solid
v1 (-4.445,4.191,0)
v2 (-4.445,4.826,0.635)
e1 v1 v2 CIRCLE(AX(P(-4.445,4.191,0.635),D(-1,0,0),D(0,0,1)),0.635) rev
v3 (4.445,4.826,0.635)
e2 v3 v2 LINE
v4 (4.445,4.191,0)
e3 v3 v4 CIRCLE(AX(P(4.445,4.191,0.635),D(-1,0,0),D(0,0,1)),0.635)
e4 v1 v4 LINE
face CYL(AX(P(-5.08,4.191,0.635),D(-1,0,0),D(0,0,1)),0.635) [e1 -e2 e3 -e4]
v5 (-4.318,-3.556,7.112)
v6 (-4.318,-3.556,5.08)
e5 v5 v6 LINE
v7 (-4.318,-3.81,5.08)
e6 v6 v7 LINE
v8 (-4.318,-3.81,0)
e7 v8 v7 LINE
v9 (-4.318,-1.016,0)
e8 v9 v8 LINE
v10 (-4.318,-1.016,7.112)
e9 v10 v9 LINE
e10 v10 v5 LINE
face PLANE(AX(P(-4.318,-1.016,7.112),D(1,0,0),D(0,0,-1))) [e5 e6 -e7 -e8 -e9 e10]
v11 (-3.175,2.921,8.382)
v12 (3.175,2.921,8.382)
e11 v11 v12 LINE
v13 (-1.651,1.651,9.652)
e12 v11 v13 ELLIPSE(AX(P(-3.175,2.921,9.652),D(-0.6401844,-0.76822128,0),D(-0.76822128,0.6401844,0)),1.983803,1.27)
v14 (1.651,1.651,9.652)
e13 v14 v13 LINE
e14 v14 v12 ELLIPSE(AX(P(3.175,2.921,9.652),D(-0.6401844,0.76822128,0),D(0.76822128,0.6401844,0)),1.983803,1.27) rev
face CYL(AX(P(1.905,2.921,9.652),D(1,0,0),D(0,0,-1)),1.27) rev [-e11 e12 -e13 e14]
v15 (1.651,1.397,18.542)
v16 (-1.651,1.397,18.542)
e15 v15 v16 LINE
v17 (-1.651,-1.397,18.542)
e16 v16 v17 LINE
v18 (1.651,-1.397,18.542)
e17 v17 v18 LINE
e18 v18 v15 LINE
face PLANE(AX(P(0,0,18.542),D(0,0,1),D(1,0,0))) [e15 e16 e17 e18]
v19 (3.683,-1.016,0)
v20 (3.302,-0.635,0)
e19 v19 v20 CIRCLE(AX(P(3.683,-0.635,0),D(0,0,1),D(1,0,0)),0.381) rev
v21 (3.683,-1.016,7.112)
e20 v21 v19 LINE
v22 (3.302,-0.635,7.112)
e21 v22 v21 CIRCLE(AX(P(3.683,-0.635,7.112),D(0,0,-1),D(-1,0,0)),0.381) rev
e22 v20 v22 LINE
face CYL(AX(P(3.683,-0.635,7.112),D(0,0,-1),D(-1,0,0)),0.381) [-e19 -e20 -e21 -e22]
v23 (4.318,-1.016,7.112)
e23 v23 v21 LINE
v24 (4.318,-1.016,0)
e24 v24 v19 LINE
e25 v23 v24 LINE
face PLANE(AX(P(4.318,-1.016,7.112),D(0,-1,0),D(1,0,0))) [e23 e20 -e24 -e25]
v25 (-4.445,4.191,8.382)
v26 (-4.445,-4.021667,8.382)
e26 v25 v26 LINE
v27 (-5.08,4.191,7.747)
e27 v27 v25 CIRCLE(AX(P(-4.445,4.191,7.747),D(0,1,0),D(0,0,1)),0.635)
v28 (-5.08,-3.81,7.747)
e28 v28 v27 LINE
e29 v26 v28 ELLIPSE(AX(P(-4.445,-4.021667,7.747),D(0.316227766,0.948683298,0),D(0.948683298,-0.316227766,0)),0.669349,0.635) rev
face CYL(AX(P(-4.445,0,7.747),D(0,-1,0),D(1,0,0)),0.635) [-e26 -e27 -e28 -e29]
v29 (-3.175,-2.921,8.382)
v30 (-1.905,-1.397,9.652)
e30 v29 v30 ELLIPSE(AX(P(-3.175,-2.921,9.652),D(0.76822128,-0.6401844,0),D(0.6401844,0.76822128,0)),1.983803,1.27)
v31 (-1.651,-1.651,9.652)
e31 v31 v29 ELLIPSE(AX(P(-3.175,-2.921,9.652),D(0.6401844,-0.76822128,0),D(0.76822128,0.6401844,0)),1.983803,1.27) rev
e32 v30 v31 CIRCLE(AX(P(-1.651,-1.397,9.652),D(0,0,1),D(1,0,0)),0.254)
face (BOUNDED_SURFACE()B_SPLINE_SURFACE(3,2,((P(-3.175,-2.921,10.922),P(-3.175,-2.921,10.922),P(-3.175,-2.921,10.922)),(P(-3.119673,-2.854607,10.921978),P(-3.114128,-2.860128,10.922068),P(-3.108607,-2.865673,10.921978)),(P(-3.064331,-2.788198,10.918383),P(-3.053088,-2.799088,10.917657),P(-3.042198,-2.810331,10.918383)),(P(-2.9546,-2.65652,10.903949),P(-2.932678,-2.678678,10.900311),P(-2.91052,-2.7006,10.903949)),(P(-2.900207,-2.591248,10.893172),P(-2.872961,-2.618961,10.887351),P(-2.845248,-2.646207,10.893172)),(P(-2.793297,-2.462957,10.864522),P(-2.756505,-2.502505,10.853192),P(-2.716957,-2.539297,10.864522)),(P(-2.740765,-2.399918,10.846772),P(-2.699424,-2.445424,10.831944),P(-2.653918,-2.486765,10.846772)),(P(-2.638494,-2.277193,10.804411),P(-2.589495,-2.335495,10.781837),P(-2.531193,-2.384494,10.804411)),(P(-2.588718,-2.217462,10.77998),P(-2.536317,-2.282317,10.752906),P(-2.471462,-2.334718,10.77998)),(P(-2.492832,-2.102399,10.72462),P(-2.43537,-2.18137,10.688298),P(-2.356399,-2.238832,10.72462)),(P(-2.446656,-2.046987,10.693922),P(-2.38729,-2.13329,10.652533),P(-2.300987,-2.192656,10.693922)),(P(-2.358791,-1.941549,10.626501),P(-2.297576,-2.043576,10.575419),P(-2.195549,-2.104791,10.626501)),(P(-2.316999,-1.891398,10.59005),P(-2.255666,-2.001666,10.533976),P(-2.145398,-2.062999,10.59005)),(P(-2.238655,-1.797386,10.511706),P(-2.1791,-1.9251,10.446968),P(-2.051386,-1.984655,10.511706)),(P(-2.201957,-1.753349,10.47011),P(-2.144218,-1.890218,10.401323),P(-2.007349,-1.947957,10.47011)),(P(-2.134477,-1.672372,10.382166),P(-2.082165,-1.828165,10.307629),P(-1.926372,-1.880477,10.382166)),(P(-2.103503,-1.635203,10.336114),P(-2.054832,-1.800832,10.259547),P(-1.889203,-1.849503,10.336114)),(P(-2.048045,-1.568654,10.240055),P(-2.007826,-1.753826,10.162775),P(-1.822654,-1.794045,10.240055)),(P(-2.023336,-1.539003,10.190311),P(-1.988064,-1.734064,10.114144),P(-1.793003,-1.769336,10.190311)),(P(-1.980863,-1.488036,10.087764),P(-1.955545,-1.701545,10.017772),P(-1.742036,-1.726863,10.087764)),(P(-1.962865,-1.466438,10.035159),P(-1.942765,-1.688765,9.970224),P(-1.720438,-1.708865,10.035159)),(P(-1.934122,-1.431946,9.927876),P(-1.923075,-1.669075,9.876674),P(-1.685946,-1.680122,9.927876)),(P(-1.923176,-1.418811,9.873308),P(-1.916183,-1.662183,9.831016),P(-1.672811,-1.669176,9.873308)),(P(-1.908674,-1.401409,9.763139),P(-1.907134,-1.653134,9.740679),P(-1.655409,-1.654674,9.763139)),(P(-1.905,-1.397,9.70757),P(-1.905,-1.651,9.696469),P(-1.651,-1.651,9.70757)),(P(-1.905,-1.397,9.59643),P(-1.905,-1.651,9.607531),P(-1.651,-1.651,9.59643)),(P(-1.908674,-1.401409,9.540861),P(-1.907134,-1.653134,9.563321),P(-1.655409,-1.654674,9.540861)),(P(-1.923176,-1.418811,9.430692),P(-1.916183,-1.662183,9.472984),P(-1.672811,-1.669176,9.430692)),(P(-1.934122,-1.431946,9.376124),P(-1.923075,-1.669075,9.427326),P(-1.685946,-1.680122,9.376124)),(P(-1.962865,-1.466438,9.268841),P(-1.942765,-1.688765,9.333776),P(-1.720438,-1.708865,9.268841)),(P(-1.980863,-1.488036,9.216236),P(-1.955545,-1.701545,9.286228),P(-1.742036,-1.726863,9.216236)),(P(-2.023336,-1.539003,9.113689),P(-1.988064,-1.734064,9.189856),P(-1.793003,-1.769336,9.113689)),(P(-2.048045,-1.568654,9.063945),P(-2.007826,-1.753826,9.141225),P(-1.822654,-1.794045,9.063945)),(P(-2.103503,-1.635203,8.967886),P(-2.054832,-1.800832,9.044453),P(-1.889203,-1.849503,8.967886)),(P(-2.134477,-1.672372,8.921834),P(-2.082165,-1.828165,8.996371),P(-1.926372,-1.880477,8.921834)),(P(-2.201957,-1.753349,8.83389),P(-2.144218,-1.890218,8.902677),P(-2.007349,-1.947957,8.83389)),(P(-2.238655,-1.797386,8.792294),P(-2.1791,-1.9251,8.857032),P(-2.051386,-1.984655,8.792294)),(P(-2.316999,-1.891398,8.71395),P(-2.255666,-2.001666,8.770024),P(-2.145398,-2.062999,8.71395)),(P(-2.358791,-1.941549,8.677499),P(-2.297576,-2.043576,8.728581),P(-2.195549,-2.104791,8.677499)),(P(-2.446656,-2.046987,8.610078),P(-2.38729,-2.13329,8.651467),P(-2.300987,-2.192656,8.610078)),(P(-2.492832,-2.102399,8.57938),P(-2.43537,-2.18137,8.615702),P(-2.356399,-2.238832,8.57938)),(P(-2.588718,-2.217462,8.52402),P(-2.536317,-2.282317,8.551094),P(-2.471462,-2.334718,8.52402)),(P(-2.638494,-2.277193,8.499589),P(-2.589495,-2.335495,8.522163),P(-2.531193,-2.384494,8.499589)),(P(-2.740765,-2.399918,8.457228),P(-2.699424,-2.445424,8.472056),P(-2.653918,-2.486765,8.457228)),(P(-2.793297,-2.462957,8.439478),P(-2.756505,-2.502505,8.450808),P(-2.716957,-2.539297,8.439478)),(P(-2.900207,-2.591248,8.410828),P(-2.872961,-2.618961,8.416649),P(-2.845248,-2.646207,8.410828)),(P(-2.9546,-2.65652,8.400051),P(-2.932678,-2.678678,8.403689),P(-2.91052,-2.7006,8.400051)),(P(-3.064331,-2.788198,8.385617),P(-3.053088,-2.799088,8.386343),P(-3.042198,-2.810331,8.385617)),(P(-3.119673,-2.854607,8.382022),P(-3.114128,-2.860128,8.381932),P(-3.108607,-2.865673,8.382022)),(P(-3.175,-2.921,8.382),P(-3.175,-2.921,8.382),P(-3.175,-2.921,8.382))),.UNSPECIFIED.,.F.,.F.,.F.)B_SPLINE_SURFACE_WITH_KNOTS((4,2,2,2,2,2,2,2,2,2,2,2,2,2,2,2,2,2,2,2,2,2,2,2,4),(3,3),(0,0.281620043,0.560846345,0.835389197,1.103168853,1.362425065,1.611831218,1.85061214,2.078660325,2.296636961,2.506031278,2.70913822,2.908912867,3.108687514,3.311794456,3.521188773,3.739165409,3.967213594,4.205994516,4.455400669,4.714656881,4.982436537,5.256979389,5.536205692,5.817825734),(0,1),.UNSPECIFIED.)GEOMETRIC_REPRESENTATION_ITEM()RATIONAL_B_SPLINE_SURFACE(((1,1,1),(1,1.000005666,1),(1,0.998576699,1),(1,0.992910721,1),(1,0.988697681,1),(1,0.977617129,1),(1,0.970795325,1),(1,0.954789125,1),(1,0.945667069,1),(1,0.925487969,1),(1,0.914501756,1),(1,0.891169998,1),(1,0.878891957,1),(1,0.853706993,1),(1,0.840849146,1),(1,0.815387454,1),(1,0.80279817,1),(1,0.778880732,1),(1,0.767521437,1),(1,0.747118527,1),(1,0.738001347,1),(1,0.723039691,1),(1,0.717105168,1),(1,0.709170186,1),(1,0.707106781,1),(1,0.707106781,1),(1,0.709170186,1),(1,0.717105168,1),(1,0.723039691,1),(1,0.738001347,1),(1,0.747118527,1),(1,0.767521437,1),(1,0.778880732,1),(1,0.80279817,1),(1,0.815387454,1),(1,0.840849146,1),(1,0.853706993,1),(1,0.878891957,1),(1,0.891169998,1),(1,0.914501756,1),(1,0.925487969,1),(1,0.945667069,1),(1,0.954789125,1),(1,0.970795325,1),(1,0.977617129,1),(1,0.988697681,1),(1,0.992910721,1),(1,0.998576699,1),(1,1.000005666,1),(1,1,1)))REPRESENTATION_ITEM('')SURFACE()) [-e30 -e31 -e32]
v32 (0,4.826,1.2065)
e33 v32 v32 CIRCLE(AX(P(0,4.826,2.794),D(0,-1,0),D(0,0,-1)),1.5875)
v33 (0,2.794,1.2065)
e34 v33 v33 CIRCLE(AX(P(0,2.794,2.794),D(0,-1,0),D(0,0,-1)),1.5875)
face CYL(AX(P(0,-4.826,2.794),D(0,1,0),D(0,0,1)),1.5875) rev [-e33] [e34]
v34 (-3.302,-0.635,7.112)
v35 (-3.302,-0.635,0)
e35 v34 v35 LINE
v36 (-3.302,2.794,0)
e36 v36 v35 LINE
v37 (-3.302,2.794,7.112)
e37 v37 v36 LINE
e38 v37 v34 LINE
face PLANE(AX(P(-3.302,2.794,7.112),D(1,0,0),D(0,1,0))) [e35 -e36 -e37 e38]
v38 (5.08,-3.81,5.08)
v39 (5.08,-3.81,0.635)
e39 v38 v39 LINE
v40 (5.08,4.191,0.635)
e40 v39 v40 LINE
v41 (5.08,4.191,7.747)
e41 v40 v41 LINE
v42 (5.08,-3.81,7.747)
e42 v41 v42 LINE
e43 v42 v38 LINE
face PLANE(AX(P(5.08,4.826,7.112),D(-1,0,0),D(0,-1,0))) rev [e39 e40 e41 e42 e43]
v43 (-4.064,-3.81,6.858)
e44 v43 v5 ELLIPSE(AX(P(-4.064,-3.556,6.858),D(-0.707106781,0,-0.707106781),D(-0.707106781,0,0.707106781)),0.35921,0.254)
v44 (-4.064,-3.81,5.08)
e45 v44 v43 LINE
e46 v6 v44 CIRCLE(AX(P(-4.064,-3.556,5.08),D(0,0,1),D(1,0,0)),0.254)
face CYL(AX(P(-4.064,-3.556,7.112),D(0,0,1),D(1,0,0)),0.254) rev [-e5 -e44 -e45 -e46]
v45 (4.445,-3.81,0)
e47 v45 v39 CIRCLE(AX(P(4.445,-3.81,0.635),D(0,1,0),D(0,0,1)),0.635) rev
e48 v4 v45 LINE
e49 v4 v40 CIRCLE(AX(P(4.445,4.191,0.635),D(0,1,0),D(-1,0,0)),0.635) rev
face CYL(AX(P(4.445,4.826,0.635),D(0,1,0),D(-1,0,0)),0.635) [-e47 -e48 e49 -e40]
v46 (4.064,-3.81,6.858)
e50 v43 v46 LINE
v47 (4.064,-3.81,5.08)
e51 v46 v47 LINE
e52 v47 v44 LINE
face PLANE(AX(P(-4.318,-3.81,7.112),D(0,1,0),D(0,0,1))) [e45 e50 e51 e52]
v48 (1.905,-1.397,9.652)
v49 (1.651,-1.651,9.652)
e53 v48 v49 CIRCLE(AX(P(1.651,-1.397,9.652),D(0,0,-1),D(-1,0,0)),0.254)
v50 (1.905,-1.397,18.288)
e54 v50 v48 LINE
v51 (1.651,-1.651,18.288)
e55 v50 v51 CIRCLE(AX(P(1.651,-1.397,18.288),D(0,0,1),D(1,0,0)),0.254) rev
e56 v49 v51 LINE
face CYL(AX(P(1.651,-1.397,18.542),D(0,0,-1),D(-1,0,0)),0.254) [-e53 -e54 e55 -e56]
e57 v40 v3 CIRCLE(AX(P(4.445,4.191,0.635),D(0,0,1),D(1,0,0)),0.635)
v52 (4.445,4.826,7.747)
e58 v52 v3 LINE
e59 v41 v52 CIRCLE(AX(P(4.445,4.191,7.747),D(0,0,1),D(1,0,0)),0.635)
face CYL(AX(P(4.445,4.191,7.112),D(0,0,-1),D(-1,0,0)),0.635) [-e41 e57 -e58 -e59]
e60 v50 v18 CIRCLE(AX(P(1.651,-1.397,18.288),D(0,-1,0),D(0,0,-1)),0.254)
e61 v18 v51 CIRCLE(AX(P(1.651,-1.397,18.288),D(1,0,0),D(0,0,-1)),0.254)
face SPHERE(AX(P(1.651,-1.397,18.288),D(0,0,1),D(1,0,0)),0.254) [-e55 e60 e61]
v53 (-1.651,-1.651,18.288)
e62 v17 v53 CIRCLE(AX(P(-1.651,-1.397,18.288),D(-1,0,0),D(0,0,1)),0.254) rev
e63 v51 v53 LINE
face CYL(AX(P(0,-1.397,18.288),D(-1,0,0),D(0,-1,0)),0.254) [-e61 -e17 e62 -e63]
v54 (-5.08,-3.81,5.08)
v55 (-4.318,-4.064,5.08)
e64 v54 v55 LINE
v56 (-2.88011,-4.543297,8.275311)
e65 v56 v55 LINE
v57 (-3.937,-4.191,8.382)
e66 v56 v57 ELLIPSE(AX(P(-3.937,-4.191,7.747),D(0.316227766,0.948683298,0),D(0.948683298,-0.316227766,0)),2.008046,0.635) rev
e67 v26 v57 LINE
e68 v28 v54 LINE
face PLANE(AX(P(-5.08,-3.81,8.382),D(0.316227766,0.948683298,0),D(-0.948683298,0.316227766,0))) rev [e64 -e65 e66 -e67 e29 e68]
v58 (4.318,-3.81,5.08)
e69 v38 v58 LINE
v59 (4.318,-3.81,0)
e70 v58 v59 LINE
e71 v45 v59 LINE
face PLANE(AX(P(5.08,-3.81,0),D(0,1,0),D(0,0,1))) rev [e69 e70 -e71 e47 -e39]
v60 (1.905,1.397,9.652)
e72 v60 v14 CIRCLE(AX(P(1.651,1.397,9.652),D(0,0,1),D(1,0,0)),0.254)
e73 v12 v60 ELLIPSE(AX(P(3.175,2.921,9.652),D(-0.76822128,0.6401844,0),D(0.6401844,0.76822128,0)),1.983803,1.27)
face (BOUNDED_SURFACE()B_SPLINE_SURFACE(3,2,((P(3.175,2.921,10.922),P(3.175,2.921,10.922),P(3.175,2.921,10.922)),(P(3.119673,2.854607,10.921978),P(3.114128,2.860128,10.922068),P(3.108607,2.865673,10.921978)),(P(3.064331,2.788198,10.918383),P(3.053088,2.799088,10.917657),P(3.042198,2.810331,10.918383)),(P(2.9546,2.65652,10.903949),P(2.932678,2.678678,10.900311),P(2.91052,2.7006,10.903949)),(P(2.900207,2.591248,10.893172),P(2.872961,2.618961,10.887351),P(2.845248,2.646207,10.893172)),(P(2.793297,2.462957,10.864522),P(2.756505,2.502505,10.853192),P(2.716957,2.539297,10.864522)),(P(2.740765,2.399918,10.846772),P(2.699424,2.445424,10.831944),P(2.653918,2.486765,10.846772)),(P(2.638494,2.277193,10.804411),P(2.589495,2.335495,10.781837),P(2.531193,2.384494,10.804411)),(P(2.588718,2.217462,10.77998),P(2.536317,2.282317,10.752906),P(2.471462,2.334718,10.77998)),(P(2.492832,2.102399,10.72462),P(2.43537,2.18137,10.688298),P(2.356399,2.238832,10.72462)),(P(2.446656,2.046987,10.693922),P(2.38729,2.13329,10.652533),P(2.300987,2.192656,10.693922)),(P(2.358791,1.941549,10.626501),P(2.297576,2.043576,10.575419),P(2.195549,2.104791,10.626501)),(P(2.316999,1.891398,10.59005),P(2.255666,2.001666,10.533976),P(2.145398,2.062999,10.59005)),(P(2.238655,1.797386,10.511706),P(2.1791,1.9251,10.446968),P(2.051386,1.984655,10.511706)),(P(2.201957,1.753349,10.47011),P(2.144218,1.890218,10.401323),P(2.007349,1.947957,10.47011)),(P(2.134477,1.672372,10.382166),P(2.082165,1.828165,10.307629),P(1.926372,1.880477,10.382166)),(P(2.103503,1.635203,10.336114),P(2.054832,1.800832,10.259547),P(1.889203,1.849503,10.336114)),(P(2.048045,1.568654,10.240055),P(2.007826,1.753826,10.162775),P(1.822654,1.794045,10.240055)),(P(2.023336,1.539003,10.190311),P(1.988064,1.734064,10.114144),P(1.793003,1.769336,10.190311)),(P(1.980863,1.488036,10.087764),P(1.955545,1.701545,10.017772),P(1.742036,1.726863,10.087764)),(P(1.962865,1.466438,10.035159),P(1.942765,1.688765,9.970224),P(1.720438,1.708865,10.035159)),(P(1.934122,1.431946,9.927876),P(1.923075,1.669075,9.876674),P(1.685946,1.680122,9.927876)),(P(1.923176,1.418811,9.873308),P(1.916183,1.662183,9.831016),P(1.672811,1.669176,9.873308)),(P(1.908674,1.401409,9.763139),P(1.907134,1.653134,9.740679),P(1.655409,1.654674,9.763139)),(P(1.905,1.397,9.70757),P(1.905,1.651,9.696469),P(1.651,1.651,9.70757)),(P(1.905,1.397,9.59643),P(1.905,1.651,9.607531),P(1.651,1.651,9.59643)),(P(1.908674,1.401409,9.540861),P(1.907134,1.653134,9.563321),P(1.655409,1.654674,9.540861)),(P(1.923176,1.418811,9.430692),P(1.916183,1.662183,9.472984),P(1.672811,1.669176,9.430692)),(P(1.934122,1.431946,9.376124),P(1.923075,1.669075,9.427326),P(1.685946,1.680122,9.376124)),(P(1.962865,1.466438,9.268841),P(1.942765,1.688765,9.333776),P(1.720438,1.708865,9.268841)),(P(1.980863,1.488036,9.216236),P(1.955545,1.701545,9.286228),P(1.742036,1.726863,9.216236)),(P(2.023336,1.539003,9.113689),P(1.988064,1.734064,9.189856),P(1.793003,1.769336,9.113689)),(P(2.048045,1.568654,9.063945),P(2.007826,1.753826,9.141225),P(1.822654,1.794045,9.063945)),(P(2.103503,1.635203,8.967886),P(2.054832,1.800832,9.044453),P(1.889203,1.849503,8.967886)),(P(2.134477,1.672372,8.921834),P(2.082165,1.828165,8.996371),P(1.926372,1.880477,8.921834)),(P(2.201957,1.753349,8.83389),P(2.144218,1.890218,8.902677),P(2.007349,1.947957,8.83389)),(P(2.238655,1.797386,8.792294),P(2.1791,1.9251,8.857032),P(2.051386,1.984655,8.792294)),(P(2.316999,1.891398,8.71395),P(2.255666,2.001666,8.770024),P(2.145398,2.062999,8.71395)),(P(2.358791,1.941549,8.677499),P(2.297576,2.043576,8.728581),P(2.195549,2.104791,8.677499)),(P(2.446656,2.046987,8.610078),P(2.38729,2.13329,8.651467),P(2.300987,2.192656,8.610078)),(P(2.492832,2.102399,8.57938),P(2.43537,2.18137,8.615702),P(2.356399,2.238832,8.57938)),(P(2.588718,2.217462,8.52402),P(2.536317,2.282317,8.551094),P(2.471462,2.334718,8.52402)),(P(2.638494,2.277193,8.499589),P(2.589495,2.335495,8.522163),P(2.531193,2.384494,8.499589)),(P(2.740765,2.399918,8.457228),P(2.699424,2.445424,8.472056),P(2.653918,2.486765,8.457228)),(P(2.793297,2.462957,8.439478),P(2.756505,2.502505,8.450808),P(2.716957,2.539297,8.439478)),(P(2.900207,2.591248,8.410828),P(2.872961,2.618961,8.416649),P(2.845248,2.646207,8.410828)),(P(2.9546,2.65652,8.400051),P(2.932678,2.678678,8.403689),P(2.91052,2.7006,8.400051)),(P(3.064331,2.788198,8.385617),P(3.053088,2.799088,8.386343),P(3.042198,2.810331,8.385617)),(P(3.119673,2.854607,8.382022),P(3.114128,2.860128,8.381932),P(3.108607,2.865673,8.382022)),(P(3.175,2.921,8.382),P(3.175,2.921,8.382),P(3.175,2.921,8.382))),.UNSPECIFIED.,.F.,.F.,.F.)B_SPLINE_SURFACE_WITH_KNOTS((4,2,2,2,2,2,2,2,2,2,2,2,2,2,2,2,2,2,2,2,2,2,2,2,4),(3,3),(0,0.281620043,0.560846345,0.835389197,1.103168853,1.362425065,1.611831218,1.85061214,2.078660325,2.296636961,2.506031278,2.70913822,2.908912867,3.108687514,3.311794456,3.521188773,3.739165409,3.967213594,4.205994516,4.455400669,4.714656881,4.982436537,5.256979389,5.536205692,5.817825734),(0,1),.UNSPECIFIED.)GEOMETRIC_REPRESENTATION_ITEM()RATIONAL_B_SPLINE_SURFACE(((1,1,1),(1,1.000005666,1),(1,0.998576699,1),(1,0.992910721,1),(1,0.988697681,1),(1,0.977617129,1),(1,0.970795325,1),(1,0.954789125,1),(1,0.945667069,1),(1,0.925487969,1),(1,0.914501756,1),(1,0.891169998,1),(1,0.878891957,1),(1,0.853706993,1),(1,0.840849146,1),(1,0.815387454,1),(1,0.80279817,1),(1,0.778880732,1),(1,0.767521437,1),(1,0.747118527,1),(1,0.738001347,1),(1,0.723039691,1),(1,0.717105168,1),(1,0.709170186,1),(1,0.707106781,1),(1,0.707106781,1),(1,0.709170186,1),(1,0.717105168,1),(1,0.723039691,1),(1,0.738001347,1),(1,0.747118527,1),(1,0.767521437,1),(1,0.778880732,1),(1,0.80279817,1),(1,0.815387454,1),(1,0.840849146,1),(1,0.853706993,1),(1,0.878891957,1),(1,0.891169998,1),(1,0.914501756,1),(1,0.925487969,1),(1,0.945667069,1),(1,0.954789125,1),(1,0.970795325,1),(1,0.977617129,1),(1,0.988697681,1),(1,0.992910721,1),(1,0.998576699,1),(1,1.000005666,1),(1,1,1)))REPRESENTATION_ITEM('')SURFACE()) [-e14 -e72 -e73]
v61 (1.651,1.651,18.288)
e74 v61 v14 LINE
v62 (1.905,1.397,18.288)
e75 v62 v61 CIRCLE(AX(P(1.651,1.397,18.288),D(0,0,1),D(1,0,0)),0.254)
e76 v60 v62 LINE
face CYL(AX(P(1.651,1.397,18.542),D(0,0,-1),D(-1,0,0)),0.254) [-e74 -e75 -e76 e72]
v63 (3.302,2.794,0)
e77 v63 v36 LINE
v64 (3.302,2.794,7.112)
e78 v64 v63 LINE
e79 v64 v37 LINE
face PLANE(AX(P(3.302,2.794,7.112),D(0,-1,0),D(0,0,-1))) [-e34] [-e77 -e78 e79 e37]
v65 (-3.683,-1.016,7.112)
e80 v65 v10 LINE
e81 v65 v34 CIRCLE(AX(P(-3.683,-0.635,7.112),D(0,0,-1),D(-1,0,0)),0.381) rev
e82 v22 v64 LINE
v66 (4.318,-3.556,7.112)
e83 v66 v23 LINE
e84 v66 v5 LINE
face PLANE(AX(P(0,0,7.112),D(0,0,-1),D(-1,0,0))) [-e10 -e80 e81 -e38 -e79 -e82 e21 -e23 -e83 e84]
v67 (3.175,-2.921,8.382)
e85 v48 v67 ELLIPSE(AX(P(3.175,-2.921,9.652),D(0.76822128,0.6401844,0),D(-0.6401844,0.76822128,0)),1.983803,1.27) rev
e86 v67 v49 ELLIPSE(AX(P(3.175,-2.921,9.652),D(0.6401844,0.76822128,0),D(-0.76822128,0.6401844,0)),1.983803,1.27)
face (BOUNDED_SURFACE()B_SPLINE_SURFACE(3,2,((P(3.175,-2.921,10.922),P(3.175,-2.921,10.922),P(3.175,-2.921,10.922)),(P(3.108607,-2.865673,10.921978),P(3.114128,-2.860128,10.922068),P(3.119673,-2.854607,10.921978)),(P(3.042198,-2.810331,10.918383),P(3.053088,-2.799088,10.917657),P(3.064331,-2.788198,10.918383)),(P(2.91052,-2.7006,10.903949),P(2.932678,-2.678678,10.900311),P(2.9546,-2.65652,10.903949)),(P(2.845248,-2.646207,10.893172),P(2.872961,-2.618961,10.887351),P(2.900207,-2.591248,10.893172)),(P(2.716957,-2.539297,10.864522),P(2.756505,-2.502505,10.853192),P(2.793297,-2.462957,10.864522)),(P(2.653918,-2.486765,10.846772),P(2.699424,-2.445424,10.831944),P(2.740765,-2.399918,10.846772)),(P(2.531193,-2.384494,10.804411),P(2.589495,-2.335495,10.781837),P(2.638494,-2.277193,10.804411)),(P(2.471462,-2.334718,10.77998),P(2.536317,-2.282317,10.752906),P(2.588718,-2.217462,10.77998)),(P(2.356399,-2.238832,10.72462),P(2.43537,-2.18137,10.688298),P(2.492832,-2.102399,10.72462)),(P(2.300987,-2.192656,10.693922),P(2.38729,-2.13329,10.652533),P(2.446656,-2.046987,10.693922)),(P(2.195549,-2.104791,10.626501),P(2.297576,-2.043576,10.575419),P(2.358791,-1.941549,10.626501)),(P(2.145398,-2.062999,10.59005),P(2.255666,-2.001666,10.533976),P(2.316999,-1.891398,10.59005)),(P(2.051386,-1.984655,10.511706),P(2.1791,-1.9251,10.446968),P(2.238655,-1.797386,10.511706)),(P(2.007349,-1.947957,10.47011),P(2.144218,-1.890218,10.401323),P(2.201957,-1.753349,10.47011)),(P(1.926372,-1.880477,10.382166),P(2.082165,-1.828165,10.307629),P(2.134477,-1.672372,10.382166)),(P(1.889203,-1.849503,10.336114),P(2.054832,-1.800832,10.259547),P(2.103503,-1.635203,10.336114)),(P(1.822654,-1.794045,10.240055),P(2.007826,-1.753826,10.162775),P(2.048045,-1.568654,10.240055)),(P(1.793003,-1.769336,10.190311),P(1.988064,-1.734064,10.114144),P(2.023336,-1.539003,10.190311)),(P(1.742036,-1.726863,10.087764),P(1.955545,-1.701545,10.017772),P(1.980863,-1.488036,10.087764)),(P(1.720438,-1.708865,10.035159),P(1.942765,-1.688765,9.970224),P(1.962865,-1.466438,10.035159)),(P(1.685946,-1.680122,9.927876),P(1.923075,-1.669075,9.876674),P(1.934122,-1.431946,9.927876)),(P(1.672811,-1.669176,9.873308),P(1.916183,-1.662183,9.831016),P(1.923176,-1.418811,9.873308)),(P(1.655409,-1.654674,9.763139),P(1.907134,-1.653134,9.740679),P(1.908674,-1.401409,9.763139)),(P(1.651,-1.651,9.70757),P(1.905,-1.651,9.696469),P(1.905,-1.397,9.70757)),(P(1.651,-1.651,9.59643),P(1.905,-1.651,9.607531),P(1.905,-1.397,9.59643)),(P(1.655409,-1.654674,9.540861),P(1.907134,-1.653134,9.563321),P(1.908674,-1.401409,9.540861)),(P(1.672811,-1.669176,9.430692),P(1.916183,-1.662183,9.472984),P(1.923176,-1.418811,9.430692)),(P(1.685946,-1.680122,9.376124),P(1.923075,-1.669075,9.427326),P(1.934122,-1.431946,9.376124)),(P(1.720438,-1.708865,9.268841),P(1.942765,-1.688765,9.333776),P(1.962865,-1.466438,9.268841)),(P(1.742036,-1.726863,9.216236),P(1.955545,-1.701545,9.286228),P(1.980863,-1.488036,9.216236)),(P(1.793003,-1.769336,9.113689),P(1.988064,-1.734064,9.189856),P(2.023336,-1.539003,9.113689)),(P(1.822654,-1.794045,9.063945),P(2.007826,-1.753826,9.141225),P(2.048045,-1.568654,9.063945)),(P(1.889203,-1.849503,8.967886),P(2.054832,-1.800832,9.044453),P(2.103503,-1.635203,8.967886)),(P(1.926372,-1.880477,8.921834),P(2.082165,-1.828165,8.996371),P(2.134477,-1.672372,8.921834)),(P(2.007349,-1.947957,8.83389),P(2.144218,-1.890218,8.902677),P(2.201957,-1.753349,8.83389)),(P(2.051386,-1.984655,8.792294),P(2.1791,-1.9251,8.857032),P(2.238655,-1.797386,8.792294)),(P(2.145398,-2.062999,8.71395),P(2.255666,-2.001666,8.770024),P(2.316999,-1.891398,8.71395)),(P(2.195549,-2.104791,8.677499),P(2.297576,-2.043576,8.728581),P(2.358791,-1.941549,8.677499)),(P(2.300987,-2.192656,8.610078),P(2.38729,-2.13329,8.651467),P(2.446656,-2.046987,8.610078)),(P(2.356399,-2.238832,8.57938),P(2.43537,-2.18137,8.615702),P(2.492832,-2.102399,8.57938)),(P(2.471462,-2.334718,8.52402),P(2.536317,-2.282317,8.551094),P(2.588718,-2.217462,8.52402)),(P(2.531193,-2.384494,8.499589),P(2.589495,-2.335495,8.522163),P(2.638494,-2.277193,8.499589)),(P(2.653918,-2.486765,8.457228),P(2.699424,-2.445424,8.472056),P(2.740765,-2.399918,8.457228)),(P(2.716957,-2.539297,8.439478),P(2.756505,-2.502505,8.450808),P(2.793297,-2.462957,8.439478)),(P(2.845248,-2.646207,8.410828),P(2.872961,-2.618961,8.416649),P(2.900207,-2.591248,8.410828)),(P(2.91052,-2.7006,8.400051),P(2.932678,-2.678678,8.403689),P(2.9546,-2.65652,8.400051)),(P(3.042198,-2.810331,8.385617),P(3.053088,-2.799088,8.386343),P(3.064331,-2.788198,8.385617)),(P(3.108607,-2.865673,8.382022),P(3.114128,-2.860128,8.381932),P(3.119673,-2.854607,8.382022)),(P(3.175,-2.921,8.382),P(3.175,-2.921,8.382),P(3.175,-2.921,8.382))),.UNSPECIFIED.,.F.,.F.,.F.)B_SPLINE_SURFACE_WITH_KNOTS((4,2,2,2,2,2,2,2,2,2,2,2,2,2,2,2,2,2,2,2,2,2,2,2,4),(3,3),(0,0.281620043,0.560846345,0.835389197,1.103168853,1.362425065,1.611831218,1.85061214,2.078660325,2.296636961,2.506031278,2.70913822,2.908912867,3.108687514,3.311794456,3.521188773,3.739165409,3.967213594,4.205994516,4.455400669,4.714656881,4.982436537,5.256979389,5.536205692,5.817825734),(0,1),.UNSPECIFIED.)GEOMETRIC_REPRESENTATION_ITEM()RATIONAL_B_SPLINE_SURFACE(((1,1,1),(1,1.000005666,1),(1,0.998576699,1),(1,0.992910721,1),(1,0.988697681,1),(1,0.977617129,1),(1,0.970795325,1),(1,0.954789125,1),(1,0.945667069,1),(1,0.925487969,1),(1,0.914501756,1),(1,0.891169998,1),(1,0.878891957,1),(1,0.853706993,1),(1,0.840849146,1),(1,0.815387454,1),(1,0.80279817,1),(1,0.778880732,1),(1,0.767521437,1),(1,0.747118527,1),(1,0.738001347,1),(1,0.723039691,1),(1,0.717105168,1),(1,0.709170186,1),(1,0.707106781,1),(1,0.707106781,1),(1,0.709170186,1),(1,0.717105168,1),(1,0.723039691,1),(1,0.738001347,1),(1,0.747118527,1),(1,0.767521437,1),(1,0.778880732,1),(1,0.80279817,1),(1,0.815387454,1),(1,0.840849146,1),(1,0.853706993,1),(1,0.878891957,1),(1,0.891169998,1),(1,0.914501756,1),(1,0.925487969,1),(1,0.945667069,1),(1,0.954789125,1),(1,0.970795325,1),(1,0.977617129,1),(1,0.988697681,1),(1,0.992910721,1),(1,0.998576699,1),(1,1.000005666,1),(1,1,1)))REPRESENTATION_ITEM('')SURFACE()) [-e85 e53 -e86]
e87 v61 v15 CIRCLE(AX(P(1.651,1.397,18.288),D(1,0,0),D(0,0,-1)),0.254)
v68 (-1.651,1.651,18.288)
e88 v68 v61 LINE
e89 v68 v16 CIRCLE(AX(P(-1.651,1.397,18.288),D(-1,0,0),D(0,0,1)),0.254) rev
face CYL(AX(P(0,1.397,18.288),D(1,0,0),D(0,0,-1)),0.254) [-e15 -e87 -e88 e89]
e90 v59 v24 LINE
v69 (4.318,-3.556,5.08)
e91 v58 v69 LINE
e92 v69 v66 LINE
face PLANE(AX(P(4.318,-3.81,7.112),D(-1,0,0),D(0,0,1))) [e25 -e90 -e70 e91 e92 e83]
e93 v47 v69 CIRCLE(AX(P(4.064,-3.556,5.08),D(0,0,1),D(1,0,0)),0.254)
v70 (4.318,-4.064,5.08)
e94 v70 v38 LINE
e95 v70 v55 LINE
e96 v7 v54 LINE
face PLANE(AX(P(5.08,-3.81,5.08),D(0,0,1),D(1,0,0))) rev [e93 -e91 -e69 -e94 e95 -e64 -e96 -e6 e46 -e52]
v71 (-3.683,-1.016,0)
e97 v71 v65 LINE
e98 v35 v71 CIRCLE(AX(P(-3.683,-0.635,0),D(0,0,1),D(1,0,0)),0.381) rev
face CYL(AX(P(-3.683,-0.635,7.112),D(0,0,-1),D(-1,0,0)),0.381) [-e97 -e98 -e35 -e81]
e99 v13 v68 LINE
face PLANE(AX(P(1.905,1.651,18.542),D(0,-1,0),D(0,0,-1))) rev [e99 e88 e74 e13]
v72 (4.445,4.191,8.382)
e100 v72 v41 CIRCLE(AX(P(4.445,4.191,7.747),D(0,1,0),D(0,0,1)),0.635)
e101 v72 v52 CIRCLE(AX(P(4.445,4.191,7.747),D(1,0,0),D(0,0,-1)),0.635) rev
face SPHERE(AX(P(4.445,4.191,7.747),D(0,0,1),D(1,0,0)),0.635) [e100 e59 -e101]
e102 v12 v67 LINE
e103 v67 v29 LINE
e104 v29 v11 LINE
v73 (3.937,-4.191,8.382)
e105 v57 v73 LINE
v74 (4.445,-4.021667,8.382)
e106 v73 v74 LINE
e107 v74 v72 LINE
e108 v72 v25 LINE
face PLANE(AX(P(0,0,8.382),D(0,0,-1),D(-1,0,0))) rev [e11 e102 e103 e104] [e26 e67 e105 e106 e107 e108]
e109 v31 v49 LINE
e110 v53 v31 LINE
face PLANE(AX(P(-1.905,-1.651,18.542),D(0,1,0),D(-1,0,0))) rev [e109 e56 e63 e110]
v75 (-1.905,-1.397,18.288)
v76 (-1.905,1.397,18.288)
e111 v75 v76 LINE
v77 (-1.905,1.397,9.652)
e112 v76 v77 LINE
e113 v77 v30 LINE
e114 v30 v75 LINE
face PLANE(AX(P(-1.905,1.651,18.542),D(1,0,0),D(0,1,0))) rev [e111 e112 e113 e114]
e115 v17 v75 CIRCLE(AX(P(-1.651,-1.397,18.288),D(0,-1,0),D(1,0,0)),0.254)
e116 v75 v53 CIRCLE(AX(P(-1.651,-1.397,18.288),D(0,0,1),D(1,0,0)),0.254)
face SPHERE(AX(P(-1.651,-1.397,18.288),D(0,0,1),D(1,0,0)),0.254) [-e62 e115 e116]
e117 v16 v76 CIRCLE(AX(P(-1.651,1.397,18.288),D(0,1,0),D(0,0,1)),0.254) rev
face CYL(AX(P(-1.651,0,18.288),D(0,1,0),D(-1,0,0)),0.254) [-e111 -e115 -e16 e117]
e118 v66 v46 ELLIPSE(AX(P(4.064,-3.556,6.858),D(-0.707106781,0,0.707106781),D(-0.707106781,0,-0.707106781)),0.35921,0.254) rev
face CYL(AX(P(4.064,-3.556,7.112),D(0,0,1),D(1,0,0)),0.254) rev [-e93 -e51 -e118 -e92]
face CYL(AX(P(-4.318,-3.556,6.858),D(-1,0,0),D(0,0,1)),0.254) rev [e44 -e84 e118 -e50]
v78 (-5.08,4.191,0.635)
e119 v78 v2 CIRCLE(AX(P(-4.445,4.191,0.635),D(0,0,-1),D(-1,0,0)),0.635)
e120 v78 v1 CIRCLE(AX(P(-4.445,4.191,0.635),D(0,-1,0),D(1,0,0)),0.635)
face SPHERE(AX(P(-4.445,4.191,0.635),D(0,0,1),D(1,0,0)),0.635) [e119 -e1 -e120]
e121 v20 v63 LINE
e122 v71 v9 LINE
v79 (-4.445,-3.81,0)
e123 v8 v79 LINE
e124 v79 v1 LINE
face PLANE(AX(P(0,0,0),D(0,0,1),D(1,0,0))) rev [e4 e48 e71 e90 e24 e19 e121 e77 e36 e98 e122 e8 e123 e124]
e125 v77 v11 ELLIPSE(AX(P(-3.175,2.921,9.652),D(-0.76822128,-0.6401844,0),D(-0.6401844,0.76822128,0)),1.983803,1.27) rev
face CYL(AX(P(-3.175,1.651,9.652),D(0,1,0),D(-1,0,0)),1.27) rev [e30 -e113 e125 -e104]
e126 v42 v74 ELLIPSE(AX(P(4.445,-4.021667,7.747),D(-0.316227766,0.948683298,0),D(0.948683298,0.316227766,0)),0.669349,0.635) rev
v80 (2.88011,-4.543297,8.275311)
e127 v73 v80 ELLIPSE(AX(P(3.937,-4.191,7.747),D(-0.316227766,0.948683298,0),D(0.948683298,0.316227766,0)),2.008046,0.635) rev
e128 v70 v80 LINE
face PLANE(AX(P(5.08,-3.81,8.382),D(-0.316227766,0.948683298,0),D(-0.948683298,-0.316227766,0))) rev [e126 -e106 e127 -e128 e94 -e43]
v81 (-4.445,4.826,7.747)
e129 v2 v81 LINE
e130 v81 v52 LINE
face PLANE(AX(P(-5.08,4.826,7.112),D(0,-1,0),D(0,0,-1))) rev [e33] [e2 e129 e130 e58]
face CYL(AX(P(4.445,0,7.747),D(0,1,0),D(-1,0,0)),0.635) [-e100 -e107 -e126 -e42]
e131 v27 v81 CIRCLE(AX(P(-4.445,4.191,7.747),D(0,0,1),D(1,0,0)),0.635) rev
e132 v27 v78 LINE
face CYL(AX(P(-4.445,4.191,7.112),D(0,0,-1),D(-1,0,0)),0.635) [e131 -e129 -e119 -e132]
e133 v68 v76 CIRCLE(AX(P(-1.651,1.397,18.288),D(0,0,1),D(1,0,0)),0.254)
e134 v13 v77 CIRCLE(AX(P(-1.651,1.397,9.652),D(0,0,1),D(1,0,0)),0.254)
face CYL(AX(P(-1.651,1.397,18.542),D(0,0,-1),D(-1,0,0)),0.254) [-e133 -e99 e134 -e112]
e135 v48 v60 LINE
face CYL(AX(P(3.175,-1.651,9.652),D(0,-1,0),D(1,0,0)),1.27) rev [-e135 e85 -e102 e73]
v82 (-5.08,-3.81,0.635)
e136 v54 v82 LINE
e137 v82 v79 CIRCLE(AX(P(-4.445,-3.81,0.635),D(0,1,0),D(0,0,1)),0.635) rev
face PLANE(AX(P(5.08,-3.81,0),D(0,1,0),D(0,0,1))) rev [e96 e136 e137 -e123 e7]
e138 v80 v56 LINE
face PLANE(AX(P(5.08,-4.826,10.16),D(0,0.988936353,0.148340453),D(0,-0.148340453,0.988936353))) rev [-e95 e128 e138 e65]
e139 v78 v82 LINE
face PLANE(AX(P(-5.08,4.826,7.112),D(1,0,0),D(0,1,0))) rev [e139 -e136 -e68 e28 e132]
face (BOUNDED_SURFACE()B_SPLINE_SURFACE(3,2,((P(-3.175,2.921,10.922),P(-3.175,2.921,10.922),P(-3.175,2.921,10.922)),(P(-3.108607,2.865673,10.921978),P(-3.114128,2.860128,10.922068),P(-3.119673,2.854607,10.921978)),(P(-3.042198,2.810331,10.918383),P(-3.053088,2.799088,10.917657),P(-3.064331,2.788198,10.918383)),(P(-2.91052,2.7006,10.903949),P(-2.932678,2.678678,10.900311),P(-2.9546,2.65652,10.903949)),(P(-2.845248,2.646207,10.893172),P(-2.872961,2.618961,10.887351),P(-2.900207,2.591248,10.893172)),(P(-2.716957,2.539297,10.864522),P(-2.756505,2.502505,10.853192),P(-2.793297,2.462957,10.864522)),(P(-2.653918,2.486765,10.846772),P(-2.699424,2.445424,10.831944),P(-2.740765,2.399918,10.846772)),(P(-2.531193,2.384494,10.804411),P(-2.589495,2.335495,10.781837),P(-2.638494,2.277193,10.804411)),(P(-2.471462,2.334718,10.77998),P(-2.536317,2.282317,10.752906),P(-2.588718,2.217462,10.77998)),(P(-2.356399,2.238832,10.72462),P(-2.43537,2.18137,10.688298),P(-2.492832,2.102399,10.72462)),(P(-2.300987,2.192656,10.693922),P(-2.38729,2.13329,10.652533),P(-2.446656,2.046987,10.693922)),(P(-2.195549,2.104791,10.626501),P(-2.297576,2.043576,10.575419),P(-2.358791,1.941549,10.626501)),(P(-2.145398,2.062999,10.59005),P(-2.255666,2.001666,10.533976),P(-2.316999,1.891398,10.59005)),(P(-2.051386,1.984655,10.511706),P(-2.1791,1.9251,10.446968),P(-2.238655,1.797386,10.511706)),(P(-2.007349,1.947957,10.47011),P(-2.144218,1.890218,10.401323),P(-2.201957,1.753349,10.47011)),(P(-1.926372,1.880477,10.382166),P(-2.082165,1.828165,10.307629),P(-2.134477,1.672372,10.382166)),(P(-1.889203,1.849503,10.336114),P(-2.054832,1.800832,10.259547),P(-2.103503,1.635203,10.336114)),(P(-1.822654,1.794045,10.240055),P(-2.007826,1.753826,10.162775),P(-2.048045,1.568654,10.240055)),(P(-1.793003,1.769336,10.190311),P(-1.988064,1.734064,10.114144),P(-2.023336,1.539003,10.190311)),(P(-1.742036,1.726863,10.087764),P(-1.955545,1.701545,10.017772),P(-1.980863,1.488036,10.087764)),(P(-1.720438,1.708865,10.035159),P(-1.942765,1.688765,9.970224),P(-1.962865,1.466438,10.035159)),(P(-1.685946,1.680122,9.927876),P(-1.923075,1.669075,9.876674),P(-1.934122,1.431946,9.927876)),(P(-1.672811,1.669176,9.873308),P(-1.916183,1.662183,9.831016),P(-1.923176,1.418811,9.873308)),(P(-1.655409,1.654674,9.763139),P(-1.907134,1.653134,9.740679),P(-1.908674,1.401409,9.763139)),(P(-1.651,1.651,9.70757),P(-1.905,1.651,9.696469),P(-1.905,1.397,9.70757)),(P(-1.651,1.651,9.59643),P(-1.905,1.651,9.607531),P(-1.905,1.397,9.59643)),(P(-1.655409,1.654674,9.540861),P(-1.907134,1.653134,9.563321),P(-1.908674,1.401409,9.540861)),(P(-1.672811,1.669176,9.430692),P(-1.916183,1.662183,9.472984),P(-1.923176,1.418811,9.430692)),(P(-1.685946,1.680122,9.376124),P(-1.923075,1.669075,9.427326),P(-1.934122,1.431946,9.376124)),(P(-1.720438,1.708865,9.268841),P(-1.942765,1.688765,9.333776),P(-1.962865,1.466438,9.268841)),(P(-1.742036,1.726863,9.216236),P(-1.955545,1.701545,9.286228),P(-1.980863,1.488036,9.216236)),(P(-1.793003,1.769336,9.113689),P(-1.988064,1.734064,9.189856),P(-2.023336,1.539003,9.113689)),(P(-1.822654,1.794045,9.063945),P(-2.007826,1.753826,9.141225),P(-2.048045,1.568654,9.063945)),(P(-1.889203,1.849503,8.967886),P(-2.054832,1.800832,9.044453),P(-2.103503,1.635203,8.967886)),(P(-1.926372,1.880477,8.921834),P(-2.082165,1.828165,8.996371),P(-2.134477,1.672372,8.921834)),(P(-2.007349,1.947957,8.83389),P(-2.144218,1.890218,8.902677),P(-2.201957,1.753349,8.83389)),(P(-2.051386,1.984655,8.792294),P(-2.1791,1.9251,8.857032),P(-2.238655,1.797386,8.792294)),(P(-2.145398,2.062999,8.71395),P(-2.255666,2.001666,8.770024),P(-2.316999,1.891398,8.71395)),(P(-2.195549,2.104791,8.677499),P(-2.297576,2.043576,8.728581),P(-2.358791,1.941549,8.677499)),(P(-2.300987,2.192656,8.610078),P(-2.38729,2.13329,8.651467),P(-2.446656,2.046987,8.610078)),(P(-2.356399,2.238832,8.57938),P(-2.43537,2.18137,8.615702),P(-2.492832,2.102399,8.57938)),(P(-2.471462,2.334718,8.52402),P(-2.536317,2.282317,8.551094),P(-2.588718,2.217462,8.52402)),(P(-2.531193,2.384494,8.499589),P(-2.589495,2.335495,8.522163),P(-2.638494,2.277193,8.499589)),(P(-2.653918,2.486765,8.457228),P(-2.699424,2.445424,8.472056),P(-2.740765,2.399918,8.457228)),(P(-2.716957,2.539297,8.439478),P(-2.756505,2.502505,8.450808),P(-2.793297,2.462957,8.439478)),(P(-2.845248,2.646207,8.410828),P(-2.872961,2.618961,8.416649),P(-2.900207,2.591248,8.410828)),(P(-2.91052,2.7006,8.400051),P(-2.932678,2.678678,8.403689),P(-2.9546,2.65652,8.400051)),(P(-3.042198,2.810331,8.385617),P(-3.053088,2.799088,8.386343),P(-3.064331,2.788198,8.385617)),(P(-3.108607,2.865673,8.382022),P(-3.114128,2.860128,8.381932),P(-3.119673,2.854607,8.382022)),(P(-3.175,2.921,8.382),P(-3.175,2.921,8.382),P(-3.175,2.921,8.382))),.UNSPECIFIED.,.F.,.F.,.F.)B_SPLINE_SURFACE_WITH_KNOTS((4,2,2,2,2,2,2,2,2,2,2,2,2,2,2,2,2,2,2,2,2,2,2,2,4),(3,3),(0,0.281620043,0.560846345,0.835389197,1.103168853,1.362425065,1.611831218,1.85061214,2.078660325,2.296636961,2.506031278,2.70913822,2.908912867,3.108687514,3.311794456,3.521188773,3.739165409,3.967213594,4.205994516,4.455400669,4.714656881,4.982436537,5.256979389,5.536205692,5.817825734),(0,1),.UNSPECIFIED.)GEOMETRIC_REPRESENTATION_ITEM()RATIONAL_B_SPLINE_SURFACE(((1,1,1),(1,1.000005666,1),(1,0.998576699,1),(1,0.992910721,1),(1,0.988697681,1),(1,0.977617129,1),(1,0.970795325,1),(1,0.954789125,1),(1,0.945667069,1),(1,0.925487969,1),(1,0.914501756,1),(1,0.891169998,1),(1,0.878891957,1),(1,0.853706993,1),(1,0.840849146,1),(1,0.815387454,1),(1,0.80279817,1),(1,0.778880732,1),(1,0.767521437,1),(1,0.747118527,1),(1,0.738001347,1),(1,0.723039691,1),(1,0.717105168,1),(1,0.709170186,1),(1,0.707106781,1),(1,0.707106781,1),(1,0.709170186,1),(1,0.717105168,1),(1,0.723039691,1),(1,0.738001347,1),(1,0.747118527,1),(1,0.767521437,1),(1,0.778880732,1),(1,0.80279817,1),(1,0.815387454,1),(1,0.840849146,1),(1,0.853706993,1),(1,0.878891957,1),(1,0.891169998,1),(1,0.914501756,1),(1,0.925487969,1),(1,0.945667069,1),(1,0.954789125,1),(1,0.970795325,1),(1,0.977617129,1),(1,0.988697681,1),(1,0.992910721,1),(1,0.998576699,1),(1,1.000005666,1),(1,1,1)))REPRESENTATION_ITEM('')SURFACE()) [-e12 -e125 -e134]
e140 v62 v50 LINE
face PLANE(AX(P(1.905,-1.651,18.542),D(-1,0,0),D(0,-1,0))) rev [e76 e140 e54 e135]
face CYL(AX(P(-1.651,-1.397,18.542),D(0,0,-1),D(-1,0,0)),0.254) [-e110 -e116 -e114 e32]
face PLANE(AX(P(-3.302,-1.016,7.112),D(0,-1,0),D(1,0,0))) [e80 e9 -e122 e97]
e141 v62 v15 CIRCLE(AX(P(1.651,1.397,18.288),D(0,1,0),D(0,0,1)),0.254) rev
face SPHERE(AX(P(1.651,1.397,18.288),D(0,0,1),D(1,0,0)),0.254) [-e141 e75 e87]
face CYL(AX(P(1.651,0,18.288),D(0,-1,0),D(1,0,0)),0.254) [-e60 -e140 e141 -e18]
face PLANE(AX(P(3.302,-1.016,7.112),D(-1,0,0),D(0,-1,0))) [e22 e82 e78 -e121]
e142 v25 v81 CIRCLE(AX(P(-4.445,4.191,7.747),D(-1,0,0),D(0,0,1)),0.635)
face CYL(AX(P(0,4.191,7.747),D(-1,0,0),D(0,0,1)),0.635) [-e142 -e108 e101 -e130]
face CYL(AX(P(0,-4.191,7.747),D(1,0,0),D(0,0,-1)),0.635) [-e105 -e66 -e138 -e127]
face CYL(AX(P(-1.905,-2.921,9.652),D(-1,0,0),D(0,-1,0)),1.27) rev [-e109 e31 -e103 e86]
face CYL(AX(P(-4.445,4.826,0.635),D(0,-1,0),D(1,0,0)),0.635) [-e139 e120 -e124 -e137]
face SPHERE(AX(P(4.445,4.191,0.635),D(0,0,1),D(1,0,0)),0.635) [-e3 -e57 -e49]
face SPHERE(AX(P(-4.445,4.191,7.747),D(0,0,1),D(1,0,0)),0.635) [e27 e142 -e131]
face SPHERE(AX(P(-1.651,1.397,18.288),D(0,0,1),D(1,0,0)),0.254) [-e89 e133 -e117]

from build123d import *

# Parameters (mm, degrees)
SKETCH1_W               = 10.16
SKETCH1_H               = 9.652
BOSS_EXTRUDE1_DEPTH     = 7.112
CUT_EXTRUDE1_DEPTH      = 14.021061708
CUT_EXTRUDE1_DEPTH_BACK = 14.021061708
SKETCH2_R               = 1.5875
SKETCH7_W               = 10.16
SKETCH7_H               = 9.652
BOSS_EXTRUDE3_DEPTH     = 1.27
FILLET1_R               = 0.635
FILLET3_R               = 0.635
FILLET4_R               = 0.381
CUT_EXTRUDE3_DEPTH      = 14.485940976
CUT_EXTRUDE3_DEPTH_BACK = 14.485940976
FILLET9_R               = 0.254
CUT_EXTRUDE7_DEPTH      = 9.654656319
SKETCH14_W              = 3.81
SKETCH14_H              = 3.302
BOSS_EXTRUDE4_DEPTH     = 10.16
FILLET14_R              = 1.27
FILLET15_R              = 0.254


with BuildPart() as part:
    # Sketch1 → Boss-Extrude1 (new body)
    with BuildSketch(Plane.XY):
        Rectangle(SKETCH1_W, SKETCH1_H)
        Polygon((-4.318, -3.81), (4.318, -3.81), (4.318, -1.016), (3.302, -1.016), (3.302, 2.794), (-3.302, 2.794), (-3.302, -1.016), (-4.318, -1.016), align=None, mode=Mode.SUBTRACT)
    extrude(amount=BOSS_EXTRUDE1_DEPTH)

    # Sketch2 → Cut-Extrude1 (cut, two sides: drawn at the far end of the back side and taken through both)
    with BuildSketch(Plane(origin=(0, 4.826, 0), x_dir=(1, 0, 0), z_dir=(0, 1, 0)).offset(-CUT_EXTRUDE1_DEPTH_BACK)):
        with Locations(Location((0, -2.794, 0), (0, 0, 90))):
            Circle(SKETCH2_R)
    extrude(amount=CUT_EXTRUDE1_DEPTH + CUT_EXTRUDE1_DEPTH_BACK, mode=Mode.SUBTRACT)

    # Sketch7 → Boss-Extrude3 (add)
    with BuildSketch(Plane.XY.offset(7.112)):
        Rectangle(SKETCH7_W, SKETCH7_H)
    extrude(amount=BOSS_EXTRUDE3_DEPTH)

    # Fillet1
    fillet1_edges = [part.edges().sort_by_distance(p)[0] for p in [
        (-5.08, 0, 0),
        (0, 4.826, 0),
        (5.08, 0, 0),
    ]]
    fillet(fillet1_edges, radius=FILLET1_R)

    # Fillet3
    # the kernel refuses this fillet: 0.635 mm, written as the material it takes off along each edge
    with BuildSketch(Plane(origin=(4.445, 4.191, 0.635), x_dir=(1, 0, 0), z_dir=(0, 1, 0))) as fillet3_piece_1_section:
        Polygon((0, 0), (FILLET3_R, 0), (FILLET3_R, FILLET3_R), (0, FILLET3_R), align=None)
    fillet3_piece_1 = extrude(amount=FILLET3_R, mode=Mode.PRIVATE)
    fillet3_piece_1 = fillet3_piece_1 - Plane(origin=(4.445, 4.191, 0.635), x_dir=(-0.7071067811865475, 0, 0.7071067811865475), z_dir=(0, 1, 0)) * Sphere(FILLET3_R, mode=Mode.PRIVATE)
    add(fillet3_piece_1, mode=Mode.SUBTRACT)
    with BuildSketch(Plane(origin=(-4.445, 4.191, 0.635), x_dir=(-1, 0, 0), z_dir=(0, 1, 0))) as fillet3_piece_2_section:
        Polygon((0, 0), (FILLET3_R, 0), (FILLET3_R, -FILLET3_R), (0, -FILLET3_R), align=None)
    fillet3_piece_2 = extrude(amount=FILLET3_R, mode=Mode.PRIVATE)
    fillet3_piece_2 = fillet3_piece_2 - Plane(origin=(-4.445, 4.191, 0.635), x_dir=(0.7071067811865475, 0, 0.7071067811865475), z_dir=(0, 1, 0)) * Sphere(FILLET3_R, mode=Mode.PRIVATE)
    add(fillet3_piece_2, mode=Mode.SUBTRACT)
    with BuildSketch(Plane(origin=(-4.445, -4.191, 7.747), x_dir=(0, 0, 1), z_dir=(-1, 0, 0))) as fillet3_piece_3_section:
        Polygon((0, 0), (FILLET3_R, 0), (FILLET3_R, -FILLET3_R), (0, -FILLET3_R), align=None)
    fillet3_piece_3 = extrude(amount=FILLET3_R, mode=Mode.PRIVATE)
    fillet3_piece_3 = fillet3_piece_3 - Plane(origin=(-4.445, -4.191, 7.747), x_dir=(0, 0.7071067811865475, -0.7071067811865475), z_dir=(-1, 0, 0)) * Sphere(FILLET3_R, mode=Mode.PRIVATE)
    add(fillet3_piece_3, mode=Mode.SUBTRACT)
    with BuildSketch(Plane(origin=(-4.445, 4.191, 7.747), x_dir=(-1, 0, 0), z_dir=(0, 1, 0))) as fillet3_piece_4_section:
        Polygon((0, 0), (FILLET3_R, 0), (FILLET3_R, FILLET3_R), (0, FILLET3_R), align=None)
    fillet3_piece_4 = extrude(amount=FILLET3_R, mode=Mode.PRIVATE)
    fillet3_piece_4 = fillet3_piece_4 - Plane(origin=(-4.445, 4.191, 7.747), x_dir=(0.7071067811865475, 0, -0.7071067811865475), z_dir=(0, 1, 0)) * Sphere(FILLET3_R, mode=Mode.PRIVATE)
    add(fillet3_piece_4, mode=Mode.SUBTRACT)
    with BuildSketch(Plane(origin=(4.445, -4.191, 7.747), x_dir=(1, 0, 0), z_dir=(0, 0, 1))) as fillet3_piece_5_section:
        Polygon((0, 0), (FILLET3_R, 0), (FILLET3_R, -FILLET3_R), (0, -FILLET3_R), align=None)
    fillet3_piece_5 = extrude(amount=FILLET3_R, mode=Mode.PRIVATE)
    fillet3_piece_5 = fillet3_piece_5 - Plane(origin=(4.445, -4.191, 7.747), x_dir=(-0.7071067811865476, 0.7071067811865475, 0), z_dir=(0, 0, 1)) * Sphere(FILLET3_R, mode=Mode.PRIVATE)
    add(fillet3_piece_5, mode=Mode.SUBTRACT)
    with BuildSketch(Plane(origin=(4.445, 4.191, 7.747), x_dir=(0, 0, 1), z_dir=(0, 1, 0))) as fillet3_piece_6_section:
        Polygon((0, 0), (FILLET3_R, 0), (FILLET3_R, FILLET3_R), (0, FILLET3_R), align=None)
    fillet3_piece_6 = extrude(amount=FILLET3_R, mode=Mode.PRIVATE)
    fillet3_piece_6 = fillet3_piece_6 - Plane(origin=(4.445, 4.191, 7.747), x_dir=(-0.7071067811865475, 0, -0.7071067811865475), z_dir=(0, 1, 0)) * Sphere(FILLET3_R, mode=Mode.PRIVATE)
    add(fillet3_piece_6, mode=Mode.SUBTRACT)
    with BuildSketch(Plane(origin=(-5.08, -4.191, 8.382), x_dir=(0, 0, -1), z_dir=(0, 1, 0))) as fillet3_piece_7:
        with BuildLine():
            CenterArc((FILLET3_R, -FILLET3_R), FILLET3_R, 90, 90)
            Line((0, -FILLET3_R), (0, 0))
            Line((0, 0), (FILLET3_R, 0))
        make_face()
    extrude(amount=8.382, mode=Mode.SUBTRACT)
    with BuildSketch(Plane(origin=(4.445, -4.826, 8.382), x_dir=(0, 1, 0), z_dir=(-1, 0, 0)), Plane(origin=(4.445, -4.826, 0), x_dir=(0, 0, 1), z_dir=(-1, 0, 0))) as fillet3_piece_8:
        with BuildLine():
            CenterArc((FILLET3_R, FILLET3_R), FILLET3_R, 180, 90)
            Line((0, FILLET3_R), (0, 0))
            Line((0, 0), (FILLET3_R, 0))
        make_face()
    extrude(amount=8.89, mode=Mode.SUBTRACT)
    with BuildSketch(Plane(origin=(5.08, 4.191, 8.382), x_dir=(-1, 0, 0), z_dir=(0, -1, 0))) as fillet3_piece_9:
        with BuildLine():
            CenterArc((FILLET3_R, FILLET3_R), FILLET3_R, 180, 90)
            Line((0, FILLET3_R), (0, 0))
            Line((0, 0), (FILLET3_R, 0))
        make_face()
    extrude(amount=8.382, mode=Mode.SUBTRACT)
    with BuildSketch(Plane(origin=(-4.445, 4.826, 8.382), x_dir=(0, 0, -1), z_dir=(1, 0, 0))) as fillet3_piece_10:
        with BuildLine():
            CenterArc((FILLET3_R, -FILLET3_R), FILLET3_R, 90, 90)
            Line((0, -FILLET3_R), (0, 0))
            Line((0, 0), (FILLET3_R, 0))
        make_face()
    extrude(amount=8.89, mode=Mode.SUBTRACT)
    with BuildSketch(Plane(origin=(4.445, -4.826, 0.635), x_dir=(0, 0, -1), z_dir=(-1, 0, 0))) as fillet3_piece_11:
        with BuildLine():
            CenterArc((0.635 - FILLET3_R, -FILLET3_R), FILLET3_R, 0, 90)
            Line((0.635, -FILLET3_R), (0.635, 0))
            Line((0.635, 0), (0.635 - FILLET3_R, 0))
        make_face()
    revolve(axis=Axis((4.445, -4.826, 0.635), (0, -1, 0)), revolution_arc=90, mode=Mode.SUBTRACT)
    with BuildSketch(Plane(origin=(-4.445, -4.826, 0.635), x_dir=(0, 0, -1), z_dir=(1, 0, 0))) as fillet3_piece_12:
        with BuildLine():
            CenterArc((0.635 - FILLET3_R, FILLET3_R), FILLET3_R, 270, 90)
            Line((0.635, FILLET3_R), (0.635, 0))
            Line((0.635, 0), (0.635 - FILLET3_R, 0))
        make_face()
    revolve(axis=Axis((-4.445, -4.826, 0.635), (0, 1, 0)), revolution_arc=90, mode=Mode.SUBTRACT)
    with BuildSketch(Plane(origin=(5.08, -4.826, 7.747), x_dir=(0, 1, 0), z_dir=(0, 0, -1)), Plane(origin=(-5.08, -4.826, 0.635), x_dir=(0, 1, 0), z_dir=(0, 0, 1)), Plane(origin=(-5.08, 4.826, 0.635), x_dir=(1, 0, 0), z_dir=(0, 0, 1)), Plane(origin=(5.08, 4.826, 7.747), x_dir=(-1, 0, 0), z_dir=(0, 0, -1))) as fillet3_piece_13:
        with BuildLine():
            CenterArc((FILLET3_R, -FILLET3_R), FILLET3_R, 90, 90)
            Line((0, -FILLET3_R), (0, 0))
            Line((0, 0), (FILLET3_R, 0))
        make_face()
    extrude(amount=7.112, mode=Mode.SUBTRACT)

    # Fillet4
    fillet4_edges = [part.edges().sort_by_distance(p)[0] for p in [
        (3.302, -1.016, 3.556),
        (-3.302, -1.016, 3.556),
    ]]
    fillet(fillet4_edges, radius=FILLET4_R)

    # Sketch11 → Cut-Extrude3 (cut, two sides: drawn at the far end of the back side and taken through both)
    with BuildSketch(Plane.ZY.offset(-4.318).offset(-CUT_EXTRUDE3_DEPTH_BACK)):
        Polygon((0, -3.81), (5.08, -3.81), (5.08, -4.064), (10.16, -4.826), (0, -4.826), align=None)
    extrude(amount=CUT_EXTRUDE3_DEPTH + CUT_EXTRUDE3_DEPTH_BACK, mode=Mode.SUBTRACT)

    # Fillet9
    fillet9_edges = [part.edges().sort_by_distance(p)[0] for p in [
        (-4.318, -3.81, 6.096),
        (4.318, -3.81, 6.096),
        (0, -3.81, 7.112),
    ]]
    fillet(fillet9_edges, radius=FILLET9_R)

    # Sketch13 → Cut-Extrude7 (cut, through all)
    with BuildSketch(Plane(origin=(0, 0, 5.08), x_dir=(-1, 0, 0), z_dir=(0, 0, -1))):
        Polygon((-5.08, -3.81), (-5.08, -4.826), (-2.032, -4.826), align=None)
        Polygon((5.08, -3.81), (5.08, -4.826), (2.032, -4.826), align=None)
    extrude(amount=-CUT_EXTRUDE7_DEPTH, mode=Mode.SUBTRACT)

    # Sketch14 → Boss-Extrude4 (add)
    with BuildSketch(Plane.XY.offset(8.382)):
        Rectangle(SKETCH14_W, SKETCH14_H)
    extrude(amount=BOSS_EXTRUDE4_DEPTH)

    # Fillet14
    fillet14_edges = [part.edges().sort_by_distance(p)[0] for p in [
        (0, 1.651, 8.382),
        (-1.905, 0, 8.382),
        (0, -1.651, 8.382),
        (1.905, 0, 8.382),
    ]]
    fillet(fillet14_edges, radius=FILLET14_R)

    # Fillet15
    fillet15_edges = [part.edges().sort_by_distance(p)[0] for p in [
        (1.905, 1.651, 14.097),
        (-1.905, 1.651, 14.097),
        (-1.905, -1.651, 14.097),
        (1.905, -1.651, 14.097),
        (0, 1.651, 18.542),
        (-1.905, 0, 18.542),
        (0, -1.651, 18.542),
        (1.905, 0, 18.542),
        (2.354517888, 2.100517888, 8.682614059),
        (2.354517888, -2.100517888, 8.682614059),
        (-2.354517888, 2.100517888, 8.682614059),
        (-2.354517888, -2.100517888, 8.682614059),
    ]]
    fillet(fillet15_edges, radius=FILLET15_R)


solid = part.part
